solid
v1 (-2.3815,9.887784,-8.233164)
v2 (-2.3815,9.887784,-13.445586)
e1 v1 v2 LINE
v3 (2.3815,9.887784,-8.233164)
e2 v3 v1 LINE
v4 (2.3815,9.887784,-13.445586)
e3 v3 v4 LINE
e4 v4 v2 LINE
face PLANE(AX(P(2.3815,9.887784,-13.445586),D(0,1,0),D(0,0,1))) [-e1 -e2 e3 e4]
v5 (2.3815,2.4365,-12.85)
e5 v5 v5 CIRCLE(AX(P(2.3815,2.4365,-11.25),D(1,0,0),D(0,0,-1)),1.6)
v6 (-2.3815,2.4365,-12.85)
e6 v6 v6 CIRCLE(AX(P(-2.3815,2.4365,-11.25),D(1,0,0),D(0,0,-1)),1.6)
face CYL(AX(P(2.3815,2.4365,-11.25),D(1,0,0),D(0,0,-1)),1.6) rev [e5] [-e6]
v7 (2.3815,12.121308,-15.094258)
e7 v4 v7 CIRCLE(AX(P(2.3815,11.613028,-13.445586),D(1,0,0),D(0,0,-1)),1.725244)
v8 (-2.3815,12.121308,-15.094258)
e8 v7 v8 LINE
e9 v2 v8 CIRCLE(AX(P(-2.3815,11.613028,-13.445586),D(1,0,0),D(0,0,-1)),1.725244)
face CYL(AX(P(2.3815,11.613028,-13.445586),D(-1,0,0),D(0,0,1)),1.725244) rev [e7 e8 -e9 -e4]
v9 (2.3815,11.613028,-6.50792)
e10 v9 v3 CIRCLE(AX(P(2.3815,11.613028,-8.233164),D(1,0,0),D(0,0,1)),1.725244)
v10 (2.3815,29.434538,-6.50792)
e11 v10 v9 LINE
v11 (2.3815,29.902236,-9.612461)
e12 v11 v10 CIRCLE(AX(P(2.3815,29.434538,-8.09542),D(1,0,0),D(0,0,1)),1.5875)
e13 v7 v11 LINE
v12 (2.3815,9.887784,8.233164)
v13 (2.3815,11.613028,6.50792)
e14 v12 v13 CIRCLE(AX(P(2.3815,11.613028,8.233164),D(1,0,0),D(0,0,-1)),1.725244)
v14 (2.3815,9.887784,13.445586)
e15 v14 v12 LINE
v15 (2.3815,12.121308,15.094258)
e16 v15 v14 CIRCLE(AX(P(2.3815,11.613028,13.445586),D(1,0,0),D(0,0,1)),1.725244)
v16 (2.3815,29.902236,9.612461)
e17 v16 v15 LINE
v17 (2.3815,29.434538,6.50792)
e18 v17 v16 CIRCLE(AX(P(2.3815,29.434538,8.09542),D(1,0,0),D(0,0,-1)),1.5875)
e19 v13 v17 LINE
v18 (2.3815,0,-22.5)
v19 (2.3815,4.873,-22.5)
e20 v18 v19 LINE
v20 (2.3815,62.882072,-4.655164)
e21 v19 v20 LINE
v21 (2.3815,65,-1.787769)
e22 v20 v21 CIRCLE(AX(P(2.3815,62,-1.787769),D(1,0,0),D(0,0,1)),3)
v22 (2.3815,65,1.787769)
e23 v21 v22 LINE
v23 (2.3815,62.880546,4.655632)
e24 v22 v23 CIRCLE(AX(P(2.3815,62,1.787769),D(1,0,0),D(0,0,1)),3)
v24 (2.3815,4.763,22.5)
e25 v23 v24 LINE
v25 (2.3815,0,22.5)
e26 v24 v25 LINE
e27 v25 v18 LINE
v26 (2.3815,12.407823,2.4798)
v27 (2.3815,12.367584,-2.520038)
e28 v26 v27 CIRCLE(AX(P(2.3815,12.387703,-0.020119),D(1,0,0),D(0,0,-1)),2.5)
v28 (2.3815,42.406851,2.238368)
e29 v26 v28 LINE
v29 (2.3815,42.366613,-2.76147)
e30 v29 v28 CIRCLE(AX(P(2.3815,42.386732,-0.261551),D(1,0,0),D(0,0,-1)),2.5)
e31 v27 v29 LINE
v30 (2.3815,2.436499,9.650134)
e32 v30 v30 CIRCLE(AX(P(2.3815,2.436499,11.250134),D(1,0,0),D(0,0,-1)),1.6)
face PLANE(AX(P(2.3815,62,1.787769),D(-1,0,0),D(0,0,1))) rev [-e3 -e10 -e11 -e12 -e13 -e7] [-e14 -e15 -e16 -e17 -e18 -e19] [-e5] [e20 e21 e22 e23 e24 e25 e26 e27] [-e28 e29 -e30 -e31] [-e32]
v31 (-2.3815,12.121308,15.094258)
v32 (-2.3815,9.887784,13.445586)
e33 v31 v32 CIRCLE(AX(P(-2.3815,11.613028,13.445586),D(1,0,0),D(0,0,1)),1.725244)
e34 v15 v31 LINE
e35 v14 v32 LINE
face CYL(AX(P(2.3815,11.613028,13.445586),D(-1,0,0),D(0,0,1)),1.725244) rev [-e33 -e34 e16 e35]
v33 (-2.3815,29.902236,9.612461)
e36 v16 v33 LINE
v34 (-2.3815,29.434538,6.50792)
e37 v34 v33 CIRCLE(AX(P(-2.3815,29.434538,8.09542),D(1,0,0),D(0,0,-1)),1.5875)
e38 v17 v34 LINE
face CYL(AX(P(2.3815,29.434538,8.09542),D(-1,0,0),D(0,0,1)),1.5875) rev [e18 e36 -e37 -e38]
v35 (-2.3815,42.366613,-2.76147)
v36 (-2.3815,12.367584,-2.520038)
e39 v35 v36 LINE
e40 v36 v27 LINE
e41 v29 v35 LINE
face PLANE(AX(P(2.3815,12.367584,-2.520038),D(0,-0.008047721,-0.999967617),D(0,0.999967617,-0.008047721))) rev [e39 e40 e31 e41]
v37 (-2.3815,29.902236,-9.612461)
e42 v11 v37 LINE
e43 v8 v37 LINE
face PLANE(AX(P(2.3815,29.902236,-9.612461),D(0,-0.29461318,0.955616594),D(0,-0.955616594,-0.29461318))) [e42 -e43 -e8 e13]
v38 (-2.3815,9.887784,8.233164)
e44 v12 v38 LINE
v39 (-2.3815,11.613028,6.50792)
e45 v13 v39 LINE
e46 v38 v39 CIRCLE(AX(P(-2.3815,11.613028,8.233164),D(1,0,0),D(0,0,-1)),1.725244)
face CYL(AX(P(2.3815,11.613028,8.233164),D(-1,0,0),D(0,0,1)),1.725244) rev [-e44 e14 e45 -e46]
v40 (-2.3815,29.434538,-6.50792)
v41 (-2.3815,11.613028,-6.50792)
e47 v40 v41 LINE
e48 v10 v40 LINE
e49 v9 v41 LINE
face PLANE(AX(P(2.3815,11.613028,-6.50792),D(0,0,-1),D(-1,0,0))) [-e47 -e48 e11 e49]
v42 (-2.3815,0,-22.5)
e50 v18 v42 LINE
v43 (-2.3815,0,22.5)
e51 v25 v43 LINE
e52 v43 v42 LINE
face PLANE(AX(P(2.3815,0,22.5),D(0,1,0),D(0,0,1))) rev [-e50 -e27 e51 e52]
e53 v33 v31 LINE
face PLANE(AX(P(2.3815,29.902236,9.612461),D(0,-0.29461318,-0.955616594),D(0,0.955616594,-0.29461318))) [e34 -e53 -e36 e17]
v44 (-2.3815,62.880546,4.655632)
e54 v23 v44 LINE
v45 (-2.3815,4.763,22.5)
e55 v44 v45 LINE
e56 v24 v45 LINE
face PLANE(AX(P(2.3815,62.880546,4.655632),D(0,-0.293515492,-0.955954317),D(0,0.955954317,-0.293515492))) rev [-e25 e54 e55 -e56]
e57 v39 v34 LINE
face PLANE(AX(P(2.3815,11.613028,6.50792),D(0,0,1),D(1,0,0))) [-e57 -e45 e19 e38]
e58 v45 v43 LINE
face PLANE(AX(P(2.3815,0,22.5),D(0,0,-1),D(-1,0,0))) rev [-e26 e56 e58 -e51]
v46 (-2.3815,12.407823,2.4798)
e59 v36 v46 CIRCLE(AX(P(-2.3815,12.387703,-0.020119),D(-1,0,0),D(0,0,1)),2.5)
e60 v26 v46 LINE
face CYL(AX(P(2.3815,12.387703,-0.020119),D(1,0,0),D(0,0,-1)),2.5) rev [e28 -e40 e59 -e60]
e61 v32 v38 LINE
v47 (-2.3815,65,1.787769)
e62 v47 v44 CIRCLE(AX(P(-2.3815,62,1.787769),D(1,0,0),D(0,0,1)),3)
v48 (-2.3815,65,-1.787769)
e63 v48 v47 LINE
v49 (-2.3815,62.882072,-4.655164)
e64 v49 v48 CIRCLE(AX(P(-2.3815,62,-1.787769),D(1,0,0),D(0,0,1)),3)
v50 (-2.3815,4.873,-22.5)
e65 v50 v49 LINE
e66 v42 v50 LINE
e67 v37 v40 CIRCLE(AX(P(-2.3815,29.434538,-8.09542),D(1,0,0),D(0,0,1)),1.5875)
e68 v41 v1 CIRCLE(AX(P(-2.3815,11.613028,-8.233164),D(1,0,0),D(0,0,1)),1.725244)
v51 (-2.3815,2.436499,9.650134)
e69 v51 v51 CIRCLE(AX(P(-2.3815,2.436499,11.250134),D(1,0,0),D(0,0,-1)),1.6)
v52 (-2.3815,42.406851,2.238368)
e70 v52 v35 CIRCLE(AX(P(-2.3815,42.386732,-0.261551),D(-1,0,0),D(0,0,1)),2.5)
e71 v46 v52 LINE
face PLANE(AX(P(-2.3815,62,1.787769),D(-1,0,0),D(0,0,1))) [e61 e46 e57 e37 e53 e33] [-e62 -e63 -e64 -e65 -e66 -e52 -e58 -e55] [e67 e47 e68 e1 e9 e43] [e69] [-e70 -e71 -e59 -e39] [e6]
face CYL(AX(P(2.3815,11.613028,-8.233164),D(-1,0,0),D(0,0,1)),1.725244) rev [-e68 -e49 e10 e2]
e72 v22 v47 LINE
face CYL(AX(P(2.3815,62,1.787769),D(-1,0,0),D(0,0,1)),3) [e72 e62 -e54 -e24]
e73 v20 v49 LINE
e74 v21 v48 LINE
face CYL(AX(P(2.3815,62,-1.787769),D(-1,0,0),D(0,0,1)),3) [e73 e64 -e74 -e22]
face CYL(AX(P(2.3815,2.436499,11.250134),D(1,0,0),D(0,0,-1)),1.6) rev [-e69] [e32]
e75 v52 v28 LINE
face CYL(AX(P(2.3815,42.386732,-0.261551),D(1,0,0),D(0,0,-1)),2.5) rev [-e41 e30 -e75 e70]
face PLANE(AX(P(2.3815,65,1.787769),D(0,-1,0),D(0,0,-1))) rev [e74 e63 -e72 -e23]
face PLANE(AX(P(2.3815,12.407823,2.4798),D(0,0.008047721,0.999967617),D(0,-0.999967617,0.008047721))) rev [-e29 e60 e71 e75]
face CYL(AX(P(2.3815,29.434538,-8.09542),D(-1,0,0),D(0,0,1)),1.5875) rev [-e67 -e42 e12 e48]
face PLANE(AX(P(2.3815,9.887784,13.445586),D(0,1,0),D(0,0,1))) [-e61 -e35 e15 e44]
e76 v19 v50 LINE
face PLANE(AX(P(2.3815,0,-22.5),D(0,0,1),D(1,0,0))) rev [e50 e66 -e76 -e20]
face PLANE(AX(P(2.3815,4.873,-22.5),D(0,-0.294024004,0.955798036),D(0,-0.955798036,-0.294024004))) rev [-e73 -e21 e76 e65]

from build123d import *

# Parameters (mm, degrees)
BOSS_EXTRUDE1_DEPTH       = 2.3815
M3_CLEARANCE_HOLE1_D      = 3.2
F_1_0MM_START             = -2.3815
F_1_0MM_DOWEL_SLOT1_DEPTH = 4.763


# Read off the part's stored shape, not the designer's step: Ø1.0mm Dowel Slot1
with BuildPart() as part:
    # Sketch1 → Boss-Extrude1 (new, symmetric)
    with BuildSketch(Plane(origin=(0, 0, 0), x_dir=(0, 0, -1), z_dir=(1, 0, 0))):
        with BuildLine():
            Line((-22.5, 0), (22.5, 0))
            Line((22.5, 0), (22.5, 4.873))
            Line((22.5, 4.873), (4.655163533, 62.882072013))
            ThreePointArc((4.655163533, 62.882072013), (3.570153218, 64.413111688), (1.787769426, 65))
            Line((1.787769426, 65), (-1.787769426, 65))
            ThreePointArc((-1.787769426, 65), (-3.570795025, 64.412637502), (-4.655632377, 62.880546477))
            Line((-4.655632377, 62.880546477), (-22.5, 4.763))
            Line((-22.5, 4.763), (-22.5, 0))
        make_face()
        with BuildLine():
            Line((6.507919955, 11.613028191), (6.507919955, 29.434537867))
            ThreePointArc((6.507919955, 29.434537867), (7.858931987, 31.004324378), (9.612461298, 29.90223629))
            Line((9.612461298, 29.90223629), (15.094257994, 12.121307765))
            ThreePointArc((15.094257994, 12.121307765), (14.833637596, 10.588440441), (13.445586349, 9.887784348))
            Line((13.445586349, 9.887784348), (8.233163799, 9.887784348))
            ThreePointArc((8.233163799, 9.887784348), (7.013232178, 10.39309657), (6.507919955, 11.613028191))
        make_face(mode=Mode.SUBTRACT)
        with BuildLine():
            Line((-9.612461298, 29.90223629), (-15.094257994, 12.121307765))
            ThreePointArc((-15.094257994, 12.121307765), (-14.833637596, 10.588440441), (-13.445586349, 9.887784348))
            Line((-13.445586349, 9.887784348), (-8.233163799, 9.887784348))
            ThreePointArc((-8.233163799, 9.887784348), (-7.013232178, 10.39309657), (-6.507919955, 11.613028191))
            Line((-6.507919955, 11.613028191), (-6.507919955, 29.434537867))
            ThreePointArc((-6.507919955, 29.434537867), (-7.858931987, 31.004324378), (-9.612461298, 29.90223629))
        make_face(mode=Mode.SUBTRACT)
    extrude(amount=BOSS_EXTRUDE1_DEPTH, both=True)

    # M3 Clearance Hole1 (through all)
    with Locations(Plane(origin=(2.3815, 0, 0), x_dir=(0, 0, -1), z_dir=(1, 0, 0))):
        with Locations((11.25, 2.4365), (-11.250134442, 2.436499343)):
            Hole(M3_CLEARANCE_HOLE1_D / 2)

    # Ø1.0mm Dowel Slot1 outline → Ø1.0mm Dowel Slot1 (cut)
    with BuildSketch(Plane.YZ.offset(F_1_0MM_START)):
        with BuildLine():
            Line((12.367584087, -2.520038343), (42.366612584, -2.761469965))
            ThreePointArc((42.366612584, -2.761469965), (44.886650928, -0.281670226), (42.406851188, 2.238368118))
            Line((42.406851188, 2.238368118), (12.407822691, 2.47979974))
            ThreePointArc((12.407822691, 2.47979974), (9.887784348, 0), (12.367584087, -2.520038343))
        make_face()
    extrude(amount=F_1_0MM_DOWEL_SLOT1_DEPTH, mode=Mode.SUBTRACT)


solid = part.part
